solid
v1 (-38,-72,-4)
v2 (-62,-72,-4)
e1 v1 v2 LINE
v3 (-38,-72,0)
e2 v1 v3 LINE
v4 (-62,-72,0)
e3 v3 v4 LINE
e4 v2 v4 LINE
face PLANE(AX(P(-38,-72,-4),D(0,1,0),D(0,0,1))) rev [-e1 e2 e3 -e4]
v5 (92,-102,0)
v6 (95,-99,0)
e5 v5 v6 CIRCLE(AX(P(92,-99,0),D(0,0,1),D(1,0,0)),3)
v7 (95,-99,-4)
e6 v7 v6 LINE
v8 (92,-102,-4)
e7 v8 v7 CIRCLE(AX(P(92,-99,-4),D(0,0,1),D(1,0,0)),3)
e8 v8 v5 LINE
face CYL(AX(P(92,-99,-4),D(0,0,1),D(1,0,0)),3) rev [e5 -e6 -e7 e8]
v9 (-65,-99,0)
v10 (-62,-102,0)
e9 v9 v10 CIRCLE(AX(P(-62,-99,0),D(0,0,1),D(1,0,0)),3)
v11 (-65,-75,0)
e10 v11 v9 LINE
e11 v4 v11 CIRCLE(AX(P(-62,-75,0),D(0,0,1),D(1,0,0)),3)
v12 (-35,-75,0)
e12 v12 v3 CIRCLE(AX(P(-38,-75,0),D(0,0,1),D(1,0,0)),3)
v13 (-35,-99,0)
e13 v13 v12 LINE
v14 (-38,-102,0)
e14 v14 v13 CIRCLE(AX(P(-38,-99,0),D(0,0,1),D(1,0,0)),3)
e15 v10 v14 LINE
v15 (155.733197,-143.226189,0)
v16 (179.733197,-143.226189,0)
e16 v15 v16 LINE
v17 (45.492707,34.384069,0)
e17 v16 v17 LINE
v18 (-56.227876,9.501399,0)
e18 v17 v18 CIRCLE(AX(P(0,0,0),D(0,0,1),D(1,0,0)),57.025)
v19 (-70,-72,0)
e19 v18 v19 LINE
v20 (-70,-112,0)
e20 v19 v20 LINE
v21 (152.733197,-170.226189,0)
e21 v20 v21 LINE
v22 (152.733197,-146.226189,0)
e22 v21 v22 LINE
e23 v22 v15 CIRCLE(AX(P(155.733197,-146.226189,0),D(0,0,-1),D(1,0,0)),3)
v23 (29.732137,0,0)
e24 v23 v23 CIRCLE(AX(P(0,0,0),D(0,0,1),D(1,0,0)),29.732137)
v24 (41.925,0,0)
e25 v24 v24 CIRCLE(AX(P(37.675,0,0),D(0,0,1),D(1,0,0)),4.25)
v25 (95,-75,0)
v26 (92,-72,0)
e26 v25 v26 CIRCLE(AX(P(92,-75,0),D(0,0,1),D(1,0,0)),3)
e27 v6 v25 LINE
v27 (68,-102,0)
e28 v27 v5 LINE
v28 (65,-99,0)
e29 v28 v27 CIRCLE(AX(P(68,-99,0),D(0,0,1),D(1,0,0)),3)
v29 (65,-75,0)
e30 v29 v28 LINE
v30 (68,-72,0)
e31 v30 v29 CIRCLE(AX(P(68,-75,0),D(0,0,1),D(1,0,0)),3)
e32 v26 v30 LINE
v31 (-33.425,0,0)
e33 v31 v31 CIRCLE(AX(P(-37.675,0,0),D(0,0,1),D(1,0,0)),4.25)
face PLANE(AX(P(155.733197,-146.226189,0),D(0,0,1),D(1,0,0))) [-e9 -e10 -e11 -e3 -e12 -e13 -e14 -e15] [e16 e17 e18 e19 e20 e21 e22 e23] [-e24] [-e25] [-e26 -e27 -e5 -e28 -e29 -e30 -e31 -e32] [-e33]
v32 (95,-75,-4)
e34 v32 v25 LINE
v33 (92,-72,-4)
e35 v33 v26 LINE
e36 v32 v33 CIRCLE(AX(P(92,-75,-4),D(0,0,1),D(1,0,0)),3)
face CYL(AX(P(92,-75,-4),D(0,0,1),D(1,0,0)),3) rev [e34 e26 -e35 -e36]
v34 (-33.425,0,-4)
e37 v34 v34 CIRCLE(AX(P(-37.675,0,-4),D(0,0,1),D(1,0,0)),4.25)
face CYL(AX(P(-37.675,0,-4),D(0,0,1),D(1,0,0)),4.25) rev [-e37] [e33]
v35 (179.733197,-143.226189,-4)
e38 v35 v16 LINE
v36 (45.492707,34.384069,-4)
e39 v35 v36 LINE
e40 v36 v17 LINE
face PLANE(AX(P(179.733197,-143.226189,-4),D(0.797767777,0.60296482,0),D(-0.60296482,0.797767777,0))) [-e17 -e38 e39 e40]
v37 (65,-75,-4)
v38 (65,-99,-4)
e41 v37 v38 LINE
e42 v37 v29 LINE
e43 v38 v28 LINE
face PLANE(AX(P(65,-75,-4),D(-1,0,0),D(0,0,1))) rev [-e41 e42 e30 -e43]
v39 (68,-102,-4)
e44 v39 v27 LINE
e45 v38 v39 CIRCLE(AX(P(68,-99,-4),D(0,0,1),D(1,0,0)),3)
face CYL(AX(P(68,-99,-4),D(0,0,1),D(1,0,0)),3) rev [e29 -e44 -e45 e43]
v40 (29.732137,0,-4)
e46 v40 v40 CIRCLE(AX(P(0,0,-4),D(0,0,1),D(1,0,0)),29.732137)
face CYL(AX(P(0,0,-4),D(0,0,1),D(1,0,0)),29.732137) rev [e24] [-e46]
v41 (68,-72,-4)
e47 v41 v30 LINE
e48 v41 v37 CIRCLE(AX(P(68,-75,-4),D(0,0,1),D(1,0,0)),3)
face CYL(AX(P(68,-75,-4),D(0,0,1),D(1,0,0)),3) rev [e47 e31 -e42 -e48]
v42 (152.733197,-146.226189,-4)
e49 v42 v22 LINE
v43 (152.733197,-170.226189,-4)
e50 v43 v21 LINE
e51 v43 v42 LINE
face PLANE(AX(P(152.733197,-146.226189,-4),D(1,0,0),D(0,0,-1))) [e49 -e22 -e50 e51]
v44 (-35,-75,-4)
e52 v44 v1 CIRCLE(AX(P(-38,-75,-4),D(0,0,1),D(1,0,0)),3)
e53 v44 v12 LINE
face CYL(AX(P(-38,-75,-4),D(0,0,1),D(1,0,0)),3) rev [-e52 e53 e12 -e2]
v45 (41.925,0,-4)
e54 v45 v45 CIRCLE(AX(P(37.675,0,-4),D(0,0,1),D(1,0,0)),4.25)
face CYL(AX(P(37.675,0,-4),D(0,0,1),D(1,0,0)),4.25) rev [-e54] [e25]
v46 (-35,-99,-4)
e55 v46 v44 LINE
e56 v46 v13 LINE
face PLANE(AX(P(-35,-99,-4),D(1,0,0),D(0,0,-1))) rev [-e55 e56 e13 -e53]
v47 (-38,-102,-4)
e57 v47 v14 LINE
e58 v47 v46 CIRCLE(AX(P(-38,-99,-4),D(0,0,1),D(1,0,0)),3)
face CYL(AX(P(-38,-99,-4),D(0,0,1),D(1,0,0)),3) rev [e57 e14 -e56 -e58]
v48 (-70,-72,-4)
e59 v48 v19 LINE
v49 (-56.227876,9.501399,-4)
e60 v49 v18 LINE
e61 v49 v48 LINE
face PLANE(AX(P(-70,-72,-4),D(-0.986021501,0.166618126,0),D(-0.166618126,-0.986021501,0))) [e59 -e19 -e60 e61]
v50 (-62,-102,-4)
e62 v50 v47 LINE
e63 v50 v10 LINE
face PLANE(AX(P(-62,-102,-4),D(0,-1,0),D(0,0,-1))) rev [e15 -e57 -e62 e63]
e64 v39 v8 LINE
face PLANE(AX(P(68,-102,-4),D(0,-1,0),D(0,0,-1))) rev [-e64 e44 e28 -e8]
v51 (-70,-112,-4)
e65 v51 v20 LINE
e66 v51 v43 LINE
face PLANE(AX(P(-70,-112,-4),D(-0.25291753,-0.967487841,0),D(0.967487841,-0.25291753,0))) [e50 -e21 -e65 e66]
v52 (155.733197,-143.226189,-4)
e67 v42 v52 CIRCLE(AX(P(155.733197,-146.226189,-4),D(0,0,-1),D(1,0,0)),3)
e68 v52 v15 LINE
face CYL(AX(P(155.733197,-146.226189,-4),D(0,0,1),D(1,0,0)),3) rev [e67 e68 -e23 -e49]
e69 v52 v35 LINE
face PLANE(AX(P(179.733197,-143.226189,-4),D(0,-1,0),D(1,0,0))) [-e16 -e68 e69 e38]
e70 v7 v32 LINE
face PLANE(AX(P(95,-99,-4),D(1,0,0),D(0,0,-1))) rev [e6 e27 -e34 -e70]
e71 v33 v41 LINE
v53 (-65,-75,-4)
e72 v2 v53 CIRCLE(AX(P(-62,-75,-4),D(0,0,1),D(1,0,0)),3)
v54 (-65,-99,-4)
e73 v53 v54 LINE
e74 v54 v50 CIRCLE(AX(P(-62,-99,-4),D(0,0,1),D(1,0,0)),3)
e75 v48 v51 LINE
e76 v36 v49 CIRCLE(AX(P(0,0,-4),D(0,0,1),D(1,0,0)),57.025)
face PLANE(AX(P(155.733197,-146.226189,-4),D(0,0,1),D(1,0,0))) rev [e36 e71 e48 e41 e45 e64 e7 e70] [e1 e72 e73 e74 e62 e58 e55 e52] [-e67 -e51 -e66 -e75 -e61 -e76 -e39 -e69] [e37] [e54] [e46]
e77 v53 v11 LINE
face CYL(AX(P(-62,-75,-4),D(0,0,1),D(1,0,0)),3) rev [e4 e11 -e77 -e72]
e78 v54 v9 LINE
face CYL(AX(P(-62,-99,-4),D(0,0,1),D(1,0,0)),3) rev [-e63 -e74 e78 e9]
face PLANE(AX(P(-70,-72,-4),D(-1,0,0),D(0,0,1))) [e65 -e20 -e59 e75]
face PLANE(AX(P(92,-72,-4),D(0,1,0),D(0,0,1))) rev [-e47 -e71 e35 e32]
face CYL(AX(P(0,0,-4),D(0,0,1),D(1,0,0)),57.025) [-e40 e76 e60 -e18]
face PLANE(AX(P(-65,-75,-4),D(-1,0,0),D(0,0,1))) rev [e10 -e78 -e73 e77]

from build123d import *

# Parameters (mm, degrees)
SKETCH_1_R             = 4.25
SKETCH_1_R_2           = 29.732137495
SM_BASE_FLANGE_1_DEPTH = 4


# Sheet-metal steps are written as plain solids
with BuildPart() as part:
    # Sketch 1 → Базовая кромка1 (new body)
    with BuildSketch(Plane.XY):
        with BuildLine():
            Line((179.733197448, -143.22618932), (45.492707493, 34.38406884))
            ThreePointArc((45.492707493, 34.38406884), (-13.549825845, 55.391812072), (-56.227876086, 9.501398625))
            Line((-56.227876086, 9.501398625), (-70, -72))
            Line((-70, -72), (-70, -112))
            Line((-70, -112), (152.733197448, -170.22618932))
            Line((152.733197448, -170.22618932), (152.733197448, -146.22618932))
            ThreePointArc((152.733197448, -146.22618932), (153.611877105, -144.104868976), (155.733197448, -143.22618932))
            Line((155.733197448, -143.22618932), (179.733197448, -143.22618932))
        make_face()
        with Locations((-37.675, 0)):
            Circle(SKETCH_1_R, mode=Mode.SUBTRACT)
        Circle(SKETCH_1_R_2, mode=Mode.SUBTRACT)
        with Locations((37.675, 0)):
            Circle(SKETCH_1_R, mode=Mode.SUBTRACT)
        with BuildLine():
            Line((-62, -102), (-38, -102))
            ThreePointArc((-38, -102), (-35.878679656, -101.121320344), (-35, -99))
            Line((-35, -99), (-35, -75))
            ThreePointArc((-35, -75), (-35.878679656, -72.878679656), (-38, -72))
            Line((-38, -72), (-62, -72))
            ThreePointArc((-62, -72), (-64.121320344, -72.878679656), (-65, -75))
            Line((-65, -75), (-65, -99))
            ThreePointArc((-65, -99), (-64.121320344, -101.121320344), (-62, -102))
        make_face(mode=Mode.SUBTRACT)
        with BuildLine():
            Line((68, -102), (92, -102))
            ThreePointArc((92, -102), (94.121320344, -101.121320344), (95, -99))
            Line((95, -99), (95, -75))
            ThreePointArc((95, -75), (94.121320344, -72.878679656), (92, -72))
            Line((92, -72), (68, -72))
            ThreePointArc((68, -72), (65.878679656, -72.878679656), (65, -75))
            Line((65, -75), (65, -99))
            ThreePointArc((65, -99), (65.878679656, -101.121320344), (68, -102))
        make_face(mode=Mode.SUBTRACT)
    extrude(amount=-SM_BASE_FLANGE_1_DEPTH)


solid = part.part
